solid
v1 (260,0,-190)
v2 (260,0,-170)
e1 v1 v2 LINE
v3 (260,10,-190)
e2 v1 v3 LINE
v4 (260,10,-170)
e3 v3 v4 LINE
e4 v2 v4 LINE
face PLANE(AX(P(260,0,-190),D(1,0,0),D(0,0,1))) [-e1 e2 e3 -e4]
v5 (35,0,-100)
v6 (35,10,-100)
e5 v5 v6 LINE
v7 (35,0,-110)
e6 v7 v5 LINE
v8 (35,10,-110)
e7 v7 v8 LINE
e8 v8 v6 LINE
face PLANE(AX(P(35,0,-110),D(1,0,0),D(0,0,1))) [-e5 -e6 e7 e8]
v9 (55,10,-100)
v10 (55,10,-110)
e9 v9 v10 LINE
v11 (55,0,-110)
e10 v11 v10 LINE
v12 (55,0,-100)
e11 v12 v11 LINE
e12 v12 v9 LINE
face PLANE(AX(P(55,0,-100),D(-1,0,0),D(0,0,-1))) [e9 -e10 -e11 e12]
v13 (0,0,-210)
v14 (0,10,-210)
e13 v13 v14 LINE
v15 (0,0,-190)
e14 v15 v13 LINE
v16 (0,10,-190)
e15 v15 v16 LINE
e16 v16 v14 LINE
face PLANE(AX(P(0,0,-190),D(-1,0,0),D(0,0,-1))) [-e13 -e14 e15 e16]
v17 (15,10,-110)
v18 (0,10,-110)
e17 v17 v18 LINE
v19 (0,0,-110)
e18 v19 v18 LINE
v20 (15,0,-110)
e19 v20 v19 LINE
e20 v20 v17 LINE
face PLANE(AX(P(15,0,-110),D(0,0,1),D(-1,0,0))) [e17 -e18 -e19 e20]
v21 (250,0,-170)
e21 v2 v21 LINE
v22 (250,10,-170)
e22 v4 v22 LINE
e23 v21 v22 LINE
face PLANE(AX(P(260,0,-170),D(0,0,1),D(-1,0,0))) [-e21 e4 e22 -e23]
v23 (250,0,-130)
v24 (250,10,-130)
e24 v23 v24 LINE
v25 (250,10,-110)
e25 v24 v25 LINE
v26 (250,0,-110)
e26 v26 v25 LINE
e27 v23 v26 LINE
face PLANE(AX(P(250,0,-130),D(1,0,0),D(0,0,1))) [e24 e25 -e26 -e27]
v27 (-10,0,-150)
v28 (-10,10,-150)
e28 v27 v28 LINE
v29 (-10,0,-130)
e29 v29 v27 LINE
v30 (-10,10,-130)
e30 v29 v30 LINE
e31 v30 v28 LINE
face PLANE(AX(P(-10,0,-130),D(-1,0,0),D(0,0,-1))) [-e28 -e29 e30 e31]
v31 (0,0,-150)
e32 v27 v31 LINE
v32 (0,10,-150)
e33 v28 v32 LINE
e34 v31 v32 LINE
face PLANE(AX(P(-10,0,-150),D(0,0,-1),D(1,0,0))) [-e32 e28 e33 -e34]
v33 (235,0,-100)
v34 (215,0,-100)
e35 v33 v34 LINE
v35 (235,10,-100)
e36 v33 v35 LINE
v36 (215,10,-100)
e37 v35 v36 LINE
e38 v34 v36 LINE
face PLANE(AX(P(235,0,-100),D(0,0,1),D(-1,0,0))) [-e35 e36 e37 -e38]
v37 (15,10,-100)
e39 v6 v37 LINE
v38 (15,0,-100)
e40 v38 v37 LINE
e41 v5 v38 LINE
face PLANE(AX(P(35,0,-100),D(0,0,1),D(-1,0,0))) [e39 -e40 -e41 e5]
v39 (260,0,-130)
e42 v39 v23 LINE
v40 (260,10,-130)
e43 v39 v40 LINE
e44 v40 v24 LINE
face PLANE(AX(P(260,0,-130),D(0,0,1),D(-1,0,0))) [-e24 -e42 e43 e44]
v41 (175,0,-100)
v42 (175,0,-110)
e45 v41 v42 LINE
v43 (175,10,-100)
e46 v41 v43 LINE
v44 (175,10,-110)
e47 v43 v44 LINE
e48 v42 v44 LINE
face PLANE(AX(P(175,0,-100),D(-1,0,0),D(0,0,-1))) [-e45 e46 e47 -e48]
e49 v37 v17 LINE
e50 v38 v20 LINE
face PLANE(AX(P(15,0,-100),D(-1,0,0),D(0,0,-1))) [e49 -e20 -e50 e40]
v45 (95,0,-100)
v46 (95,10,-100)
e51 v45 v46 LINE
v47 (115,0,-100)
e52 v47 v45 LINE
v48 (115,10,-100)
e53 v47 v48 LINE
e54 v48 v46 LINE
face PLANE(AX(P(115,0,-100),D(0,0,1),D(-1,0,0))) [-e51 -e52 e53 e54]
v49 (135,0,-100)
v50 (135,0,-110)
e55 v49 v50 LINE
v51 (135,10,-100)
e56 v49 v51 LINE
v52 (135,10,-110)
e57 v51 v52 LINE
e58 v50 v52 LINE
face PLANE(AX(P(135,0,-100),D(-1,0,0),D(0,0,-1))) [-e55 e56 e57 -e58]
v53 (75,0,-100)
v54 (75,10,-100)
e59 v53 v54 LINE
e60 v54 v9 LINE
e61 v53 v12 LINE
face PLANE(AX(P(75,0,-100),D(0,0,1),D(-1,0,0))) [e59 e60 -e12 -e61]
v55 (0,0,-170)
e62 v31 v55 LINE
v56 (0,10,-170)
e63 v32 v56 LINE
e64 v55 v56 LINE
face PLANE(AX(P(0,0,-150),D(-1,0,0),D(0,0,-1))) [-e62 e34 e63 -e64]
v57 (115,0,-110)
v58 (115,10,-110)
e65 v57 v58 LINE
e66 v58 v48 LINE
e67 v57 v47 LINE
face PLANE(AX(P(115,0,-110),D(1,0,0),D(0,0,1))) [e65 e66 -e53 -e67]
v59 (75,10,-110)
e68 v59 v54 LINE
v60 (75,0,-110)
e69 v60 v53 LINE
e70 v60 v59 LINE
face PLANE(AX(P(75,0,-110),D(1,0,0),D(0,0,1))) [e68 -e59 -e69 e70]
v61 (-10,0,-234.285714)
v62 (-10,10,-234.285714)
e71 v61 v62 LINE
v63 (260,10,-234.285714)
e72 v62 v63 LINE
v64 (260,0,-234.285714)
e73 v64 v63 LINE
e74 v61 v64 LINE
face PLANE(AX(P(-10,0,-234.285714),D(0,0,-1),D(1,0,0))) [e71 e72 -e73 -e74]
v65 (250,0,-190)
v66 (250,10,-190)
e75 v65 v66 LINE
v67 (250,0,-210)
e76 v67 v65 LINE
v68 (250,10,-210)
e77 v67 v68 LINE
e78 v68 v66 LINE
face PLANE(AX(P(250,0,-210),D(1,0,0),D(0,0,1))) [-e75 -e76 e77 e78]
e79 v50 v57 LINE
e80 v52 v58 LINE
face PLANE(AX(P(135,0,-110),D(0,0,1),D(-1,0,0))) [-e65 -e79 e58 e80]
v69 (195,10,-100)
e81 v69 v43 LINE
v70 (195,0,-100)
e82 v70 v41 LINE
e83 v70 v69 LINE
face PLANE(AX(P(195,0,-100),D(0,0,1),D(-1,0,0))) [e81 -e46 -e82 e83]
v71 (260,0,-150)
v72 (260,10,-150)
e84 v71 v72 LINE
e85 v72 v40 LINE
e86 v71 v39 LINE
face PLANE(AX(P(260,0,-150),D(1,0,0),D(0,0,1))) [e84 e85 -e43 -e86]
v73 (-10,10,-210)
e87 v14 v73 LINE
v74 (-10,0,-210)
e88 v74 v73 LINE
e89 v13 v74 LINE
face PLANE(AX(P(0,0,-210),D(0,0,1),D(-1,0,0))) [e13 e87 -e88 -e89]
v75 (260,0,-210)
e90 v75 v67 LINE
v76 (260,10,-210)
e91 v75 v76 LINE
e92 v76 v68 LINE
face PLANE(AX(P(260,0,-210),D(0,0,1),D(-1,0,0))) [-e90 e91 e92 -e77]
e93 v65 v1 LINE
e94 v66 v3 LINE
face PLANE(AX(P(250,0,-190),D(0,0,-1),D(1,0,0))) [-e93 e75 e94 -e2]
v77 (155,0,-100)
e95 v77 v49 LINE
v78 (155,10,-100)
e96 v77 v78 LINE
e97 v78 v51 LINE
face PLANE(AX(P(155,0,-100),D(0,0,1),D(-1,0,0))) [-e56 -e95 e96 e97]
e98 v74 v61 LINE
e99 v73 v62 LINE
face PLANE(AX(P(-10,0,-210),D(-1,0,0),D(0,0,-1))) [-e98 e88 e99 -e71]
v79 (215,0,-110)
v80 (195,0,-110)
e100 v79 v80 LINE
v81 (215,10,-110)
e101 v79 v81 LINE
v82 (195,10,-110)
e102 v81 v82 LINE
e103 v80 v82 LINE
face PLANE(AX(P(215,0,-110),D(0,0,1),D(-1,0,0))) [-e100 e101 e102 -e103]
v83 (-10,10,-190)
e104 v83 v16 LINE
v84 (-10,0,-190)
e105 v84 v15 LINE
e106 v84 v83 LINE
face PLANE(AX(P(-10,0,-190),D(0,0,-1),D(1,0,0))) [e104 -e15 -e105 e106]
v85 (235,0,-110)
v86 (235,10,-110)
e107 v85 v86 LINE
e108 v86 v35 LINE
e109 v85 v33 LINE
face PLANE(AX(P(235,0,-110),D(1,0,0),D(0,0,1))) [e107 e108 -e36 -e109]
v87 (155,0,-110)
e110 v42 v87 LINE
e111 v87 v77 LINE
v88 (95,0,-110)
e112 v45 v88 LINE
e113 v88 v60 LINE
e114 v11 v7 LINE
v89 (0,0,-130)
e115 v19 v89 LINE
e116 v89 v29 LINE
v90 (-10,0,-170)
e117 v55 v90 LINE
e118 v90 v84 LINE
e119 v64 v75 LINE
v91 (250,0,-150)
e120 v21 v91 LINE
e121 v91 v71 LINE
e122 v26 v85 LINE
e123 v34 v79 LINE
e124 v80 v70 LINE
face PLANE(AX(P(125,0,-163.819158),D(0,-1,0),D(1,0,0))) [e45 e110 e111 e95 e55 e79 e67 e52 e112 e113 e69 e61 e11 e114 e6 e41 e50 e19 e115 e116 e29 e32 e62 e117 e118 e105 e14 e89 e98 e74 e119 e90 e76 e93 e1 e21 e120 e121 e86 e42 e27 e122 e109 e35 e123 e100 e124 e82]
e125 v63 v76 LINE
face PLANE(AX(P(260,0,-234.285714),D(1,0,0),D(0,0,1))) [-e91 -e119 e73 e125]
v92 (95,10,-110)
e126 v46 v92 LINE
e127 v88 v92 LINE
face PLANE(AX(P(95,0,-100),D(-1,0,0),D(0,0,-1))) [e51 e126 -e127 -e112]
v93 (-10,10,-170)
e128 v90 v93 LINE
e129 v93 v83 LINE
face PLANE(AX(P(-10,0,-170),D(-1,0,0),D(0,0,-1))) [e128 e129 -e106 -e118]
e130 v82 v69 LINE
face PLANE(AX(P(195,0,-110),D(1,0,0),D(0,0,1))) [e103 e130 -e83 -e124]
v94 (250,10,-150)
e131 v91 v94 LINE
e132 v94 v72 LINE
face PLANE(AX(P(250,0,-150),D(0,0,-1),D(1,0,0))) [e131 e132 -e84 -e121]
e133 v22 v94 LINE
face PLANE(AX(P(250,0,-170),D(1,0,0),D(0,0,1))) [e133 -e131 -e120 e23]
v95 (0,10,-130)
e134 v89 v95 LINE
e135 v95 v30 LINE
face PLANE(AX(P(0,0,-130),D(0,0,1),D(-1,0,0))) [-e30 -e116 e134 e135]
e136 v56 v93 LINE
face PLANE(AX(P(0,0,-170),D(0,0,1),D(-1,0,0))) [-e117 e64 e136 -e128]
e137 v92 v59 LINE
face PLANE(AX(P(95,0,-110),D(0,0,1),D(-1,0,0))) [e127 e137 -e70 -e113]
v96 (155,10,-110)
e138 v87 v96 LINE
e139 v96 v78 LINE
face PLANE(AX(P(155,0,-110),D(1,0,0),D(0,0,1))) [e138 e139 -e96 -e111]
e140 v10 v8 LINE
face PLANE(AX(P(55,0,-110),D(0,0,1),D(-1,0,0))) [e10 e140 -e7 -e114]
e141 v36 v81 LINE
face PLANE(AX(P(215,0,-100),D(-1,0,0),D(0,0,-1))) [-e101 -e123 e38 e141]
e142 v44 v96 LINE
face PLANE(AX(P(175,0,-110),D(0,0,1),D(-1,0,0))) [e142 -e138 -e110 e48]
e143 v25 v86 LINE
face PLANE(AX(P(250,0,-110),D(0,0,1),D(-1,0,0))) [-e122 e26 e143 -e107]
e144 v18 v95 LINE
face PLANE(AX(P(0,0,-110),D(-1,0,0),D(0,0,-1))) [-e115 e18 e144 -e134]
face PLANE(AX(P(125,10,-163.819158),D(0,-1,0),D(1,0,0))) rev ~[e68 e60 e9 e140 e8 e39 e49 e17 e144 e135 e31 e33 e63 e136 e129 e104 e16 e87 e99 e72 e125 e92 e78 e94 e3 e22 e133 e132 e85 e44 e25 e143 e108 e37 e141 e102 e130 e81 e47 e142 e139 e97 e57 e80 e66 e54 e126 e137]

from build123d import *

# Parameters (mm, degrees)
F1_DEPTH = 10


# Not quite as in the source:
# - a feature names something its author has since deleted; it is built from what else it names


with BuildPart() as f1:
    # F0 (on Front) → F1 (new body)
    with BuildSketch(Plane.XZ):
        Polygon((135, -100), (135, -110), (115, -110), (115, -100), (95, -100), (95, -110), (75, -110), (75, -100), (55, -100), (55, -110), (35, -110), (35, -100), (15, -100), (15, -110), (0, -110), (0, -130), (-10, -130), (-10, -150), (0, -150), (0, -170), (-10, -170), (-10, -190), (0, -190), (0, -210), (-10, -210), (-10, -234.2857142857), (260, -234.2857142857), (260, -210), (250, -210), (250, -190), (260, -190), (260, -170), (250, -170), (250, -150), (260, -150), (260, -130), (250, -130), (250, -110), (235, -110), (235, -100), (215, -100), (215, -110), (195, -110), (195, -100), (175, -100), (175, -110), (155, -110), (155, -100), align=None)
    extrude(amount=-F1_DEPTH)


solid = f1.part
